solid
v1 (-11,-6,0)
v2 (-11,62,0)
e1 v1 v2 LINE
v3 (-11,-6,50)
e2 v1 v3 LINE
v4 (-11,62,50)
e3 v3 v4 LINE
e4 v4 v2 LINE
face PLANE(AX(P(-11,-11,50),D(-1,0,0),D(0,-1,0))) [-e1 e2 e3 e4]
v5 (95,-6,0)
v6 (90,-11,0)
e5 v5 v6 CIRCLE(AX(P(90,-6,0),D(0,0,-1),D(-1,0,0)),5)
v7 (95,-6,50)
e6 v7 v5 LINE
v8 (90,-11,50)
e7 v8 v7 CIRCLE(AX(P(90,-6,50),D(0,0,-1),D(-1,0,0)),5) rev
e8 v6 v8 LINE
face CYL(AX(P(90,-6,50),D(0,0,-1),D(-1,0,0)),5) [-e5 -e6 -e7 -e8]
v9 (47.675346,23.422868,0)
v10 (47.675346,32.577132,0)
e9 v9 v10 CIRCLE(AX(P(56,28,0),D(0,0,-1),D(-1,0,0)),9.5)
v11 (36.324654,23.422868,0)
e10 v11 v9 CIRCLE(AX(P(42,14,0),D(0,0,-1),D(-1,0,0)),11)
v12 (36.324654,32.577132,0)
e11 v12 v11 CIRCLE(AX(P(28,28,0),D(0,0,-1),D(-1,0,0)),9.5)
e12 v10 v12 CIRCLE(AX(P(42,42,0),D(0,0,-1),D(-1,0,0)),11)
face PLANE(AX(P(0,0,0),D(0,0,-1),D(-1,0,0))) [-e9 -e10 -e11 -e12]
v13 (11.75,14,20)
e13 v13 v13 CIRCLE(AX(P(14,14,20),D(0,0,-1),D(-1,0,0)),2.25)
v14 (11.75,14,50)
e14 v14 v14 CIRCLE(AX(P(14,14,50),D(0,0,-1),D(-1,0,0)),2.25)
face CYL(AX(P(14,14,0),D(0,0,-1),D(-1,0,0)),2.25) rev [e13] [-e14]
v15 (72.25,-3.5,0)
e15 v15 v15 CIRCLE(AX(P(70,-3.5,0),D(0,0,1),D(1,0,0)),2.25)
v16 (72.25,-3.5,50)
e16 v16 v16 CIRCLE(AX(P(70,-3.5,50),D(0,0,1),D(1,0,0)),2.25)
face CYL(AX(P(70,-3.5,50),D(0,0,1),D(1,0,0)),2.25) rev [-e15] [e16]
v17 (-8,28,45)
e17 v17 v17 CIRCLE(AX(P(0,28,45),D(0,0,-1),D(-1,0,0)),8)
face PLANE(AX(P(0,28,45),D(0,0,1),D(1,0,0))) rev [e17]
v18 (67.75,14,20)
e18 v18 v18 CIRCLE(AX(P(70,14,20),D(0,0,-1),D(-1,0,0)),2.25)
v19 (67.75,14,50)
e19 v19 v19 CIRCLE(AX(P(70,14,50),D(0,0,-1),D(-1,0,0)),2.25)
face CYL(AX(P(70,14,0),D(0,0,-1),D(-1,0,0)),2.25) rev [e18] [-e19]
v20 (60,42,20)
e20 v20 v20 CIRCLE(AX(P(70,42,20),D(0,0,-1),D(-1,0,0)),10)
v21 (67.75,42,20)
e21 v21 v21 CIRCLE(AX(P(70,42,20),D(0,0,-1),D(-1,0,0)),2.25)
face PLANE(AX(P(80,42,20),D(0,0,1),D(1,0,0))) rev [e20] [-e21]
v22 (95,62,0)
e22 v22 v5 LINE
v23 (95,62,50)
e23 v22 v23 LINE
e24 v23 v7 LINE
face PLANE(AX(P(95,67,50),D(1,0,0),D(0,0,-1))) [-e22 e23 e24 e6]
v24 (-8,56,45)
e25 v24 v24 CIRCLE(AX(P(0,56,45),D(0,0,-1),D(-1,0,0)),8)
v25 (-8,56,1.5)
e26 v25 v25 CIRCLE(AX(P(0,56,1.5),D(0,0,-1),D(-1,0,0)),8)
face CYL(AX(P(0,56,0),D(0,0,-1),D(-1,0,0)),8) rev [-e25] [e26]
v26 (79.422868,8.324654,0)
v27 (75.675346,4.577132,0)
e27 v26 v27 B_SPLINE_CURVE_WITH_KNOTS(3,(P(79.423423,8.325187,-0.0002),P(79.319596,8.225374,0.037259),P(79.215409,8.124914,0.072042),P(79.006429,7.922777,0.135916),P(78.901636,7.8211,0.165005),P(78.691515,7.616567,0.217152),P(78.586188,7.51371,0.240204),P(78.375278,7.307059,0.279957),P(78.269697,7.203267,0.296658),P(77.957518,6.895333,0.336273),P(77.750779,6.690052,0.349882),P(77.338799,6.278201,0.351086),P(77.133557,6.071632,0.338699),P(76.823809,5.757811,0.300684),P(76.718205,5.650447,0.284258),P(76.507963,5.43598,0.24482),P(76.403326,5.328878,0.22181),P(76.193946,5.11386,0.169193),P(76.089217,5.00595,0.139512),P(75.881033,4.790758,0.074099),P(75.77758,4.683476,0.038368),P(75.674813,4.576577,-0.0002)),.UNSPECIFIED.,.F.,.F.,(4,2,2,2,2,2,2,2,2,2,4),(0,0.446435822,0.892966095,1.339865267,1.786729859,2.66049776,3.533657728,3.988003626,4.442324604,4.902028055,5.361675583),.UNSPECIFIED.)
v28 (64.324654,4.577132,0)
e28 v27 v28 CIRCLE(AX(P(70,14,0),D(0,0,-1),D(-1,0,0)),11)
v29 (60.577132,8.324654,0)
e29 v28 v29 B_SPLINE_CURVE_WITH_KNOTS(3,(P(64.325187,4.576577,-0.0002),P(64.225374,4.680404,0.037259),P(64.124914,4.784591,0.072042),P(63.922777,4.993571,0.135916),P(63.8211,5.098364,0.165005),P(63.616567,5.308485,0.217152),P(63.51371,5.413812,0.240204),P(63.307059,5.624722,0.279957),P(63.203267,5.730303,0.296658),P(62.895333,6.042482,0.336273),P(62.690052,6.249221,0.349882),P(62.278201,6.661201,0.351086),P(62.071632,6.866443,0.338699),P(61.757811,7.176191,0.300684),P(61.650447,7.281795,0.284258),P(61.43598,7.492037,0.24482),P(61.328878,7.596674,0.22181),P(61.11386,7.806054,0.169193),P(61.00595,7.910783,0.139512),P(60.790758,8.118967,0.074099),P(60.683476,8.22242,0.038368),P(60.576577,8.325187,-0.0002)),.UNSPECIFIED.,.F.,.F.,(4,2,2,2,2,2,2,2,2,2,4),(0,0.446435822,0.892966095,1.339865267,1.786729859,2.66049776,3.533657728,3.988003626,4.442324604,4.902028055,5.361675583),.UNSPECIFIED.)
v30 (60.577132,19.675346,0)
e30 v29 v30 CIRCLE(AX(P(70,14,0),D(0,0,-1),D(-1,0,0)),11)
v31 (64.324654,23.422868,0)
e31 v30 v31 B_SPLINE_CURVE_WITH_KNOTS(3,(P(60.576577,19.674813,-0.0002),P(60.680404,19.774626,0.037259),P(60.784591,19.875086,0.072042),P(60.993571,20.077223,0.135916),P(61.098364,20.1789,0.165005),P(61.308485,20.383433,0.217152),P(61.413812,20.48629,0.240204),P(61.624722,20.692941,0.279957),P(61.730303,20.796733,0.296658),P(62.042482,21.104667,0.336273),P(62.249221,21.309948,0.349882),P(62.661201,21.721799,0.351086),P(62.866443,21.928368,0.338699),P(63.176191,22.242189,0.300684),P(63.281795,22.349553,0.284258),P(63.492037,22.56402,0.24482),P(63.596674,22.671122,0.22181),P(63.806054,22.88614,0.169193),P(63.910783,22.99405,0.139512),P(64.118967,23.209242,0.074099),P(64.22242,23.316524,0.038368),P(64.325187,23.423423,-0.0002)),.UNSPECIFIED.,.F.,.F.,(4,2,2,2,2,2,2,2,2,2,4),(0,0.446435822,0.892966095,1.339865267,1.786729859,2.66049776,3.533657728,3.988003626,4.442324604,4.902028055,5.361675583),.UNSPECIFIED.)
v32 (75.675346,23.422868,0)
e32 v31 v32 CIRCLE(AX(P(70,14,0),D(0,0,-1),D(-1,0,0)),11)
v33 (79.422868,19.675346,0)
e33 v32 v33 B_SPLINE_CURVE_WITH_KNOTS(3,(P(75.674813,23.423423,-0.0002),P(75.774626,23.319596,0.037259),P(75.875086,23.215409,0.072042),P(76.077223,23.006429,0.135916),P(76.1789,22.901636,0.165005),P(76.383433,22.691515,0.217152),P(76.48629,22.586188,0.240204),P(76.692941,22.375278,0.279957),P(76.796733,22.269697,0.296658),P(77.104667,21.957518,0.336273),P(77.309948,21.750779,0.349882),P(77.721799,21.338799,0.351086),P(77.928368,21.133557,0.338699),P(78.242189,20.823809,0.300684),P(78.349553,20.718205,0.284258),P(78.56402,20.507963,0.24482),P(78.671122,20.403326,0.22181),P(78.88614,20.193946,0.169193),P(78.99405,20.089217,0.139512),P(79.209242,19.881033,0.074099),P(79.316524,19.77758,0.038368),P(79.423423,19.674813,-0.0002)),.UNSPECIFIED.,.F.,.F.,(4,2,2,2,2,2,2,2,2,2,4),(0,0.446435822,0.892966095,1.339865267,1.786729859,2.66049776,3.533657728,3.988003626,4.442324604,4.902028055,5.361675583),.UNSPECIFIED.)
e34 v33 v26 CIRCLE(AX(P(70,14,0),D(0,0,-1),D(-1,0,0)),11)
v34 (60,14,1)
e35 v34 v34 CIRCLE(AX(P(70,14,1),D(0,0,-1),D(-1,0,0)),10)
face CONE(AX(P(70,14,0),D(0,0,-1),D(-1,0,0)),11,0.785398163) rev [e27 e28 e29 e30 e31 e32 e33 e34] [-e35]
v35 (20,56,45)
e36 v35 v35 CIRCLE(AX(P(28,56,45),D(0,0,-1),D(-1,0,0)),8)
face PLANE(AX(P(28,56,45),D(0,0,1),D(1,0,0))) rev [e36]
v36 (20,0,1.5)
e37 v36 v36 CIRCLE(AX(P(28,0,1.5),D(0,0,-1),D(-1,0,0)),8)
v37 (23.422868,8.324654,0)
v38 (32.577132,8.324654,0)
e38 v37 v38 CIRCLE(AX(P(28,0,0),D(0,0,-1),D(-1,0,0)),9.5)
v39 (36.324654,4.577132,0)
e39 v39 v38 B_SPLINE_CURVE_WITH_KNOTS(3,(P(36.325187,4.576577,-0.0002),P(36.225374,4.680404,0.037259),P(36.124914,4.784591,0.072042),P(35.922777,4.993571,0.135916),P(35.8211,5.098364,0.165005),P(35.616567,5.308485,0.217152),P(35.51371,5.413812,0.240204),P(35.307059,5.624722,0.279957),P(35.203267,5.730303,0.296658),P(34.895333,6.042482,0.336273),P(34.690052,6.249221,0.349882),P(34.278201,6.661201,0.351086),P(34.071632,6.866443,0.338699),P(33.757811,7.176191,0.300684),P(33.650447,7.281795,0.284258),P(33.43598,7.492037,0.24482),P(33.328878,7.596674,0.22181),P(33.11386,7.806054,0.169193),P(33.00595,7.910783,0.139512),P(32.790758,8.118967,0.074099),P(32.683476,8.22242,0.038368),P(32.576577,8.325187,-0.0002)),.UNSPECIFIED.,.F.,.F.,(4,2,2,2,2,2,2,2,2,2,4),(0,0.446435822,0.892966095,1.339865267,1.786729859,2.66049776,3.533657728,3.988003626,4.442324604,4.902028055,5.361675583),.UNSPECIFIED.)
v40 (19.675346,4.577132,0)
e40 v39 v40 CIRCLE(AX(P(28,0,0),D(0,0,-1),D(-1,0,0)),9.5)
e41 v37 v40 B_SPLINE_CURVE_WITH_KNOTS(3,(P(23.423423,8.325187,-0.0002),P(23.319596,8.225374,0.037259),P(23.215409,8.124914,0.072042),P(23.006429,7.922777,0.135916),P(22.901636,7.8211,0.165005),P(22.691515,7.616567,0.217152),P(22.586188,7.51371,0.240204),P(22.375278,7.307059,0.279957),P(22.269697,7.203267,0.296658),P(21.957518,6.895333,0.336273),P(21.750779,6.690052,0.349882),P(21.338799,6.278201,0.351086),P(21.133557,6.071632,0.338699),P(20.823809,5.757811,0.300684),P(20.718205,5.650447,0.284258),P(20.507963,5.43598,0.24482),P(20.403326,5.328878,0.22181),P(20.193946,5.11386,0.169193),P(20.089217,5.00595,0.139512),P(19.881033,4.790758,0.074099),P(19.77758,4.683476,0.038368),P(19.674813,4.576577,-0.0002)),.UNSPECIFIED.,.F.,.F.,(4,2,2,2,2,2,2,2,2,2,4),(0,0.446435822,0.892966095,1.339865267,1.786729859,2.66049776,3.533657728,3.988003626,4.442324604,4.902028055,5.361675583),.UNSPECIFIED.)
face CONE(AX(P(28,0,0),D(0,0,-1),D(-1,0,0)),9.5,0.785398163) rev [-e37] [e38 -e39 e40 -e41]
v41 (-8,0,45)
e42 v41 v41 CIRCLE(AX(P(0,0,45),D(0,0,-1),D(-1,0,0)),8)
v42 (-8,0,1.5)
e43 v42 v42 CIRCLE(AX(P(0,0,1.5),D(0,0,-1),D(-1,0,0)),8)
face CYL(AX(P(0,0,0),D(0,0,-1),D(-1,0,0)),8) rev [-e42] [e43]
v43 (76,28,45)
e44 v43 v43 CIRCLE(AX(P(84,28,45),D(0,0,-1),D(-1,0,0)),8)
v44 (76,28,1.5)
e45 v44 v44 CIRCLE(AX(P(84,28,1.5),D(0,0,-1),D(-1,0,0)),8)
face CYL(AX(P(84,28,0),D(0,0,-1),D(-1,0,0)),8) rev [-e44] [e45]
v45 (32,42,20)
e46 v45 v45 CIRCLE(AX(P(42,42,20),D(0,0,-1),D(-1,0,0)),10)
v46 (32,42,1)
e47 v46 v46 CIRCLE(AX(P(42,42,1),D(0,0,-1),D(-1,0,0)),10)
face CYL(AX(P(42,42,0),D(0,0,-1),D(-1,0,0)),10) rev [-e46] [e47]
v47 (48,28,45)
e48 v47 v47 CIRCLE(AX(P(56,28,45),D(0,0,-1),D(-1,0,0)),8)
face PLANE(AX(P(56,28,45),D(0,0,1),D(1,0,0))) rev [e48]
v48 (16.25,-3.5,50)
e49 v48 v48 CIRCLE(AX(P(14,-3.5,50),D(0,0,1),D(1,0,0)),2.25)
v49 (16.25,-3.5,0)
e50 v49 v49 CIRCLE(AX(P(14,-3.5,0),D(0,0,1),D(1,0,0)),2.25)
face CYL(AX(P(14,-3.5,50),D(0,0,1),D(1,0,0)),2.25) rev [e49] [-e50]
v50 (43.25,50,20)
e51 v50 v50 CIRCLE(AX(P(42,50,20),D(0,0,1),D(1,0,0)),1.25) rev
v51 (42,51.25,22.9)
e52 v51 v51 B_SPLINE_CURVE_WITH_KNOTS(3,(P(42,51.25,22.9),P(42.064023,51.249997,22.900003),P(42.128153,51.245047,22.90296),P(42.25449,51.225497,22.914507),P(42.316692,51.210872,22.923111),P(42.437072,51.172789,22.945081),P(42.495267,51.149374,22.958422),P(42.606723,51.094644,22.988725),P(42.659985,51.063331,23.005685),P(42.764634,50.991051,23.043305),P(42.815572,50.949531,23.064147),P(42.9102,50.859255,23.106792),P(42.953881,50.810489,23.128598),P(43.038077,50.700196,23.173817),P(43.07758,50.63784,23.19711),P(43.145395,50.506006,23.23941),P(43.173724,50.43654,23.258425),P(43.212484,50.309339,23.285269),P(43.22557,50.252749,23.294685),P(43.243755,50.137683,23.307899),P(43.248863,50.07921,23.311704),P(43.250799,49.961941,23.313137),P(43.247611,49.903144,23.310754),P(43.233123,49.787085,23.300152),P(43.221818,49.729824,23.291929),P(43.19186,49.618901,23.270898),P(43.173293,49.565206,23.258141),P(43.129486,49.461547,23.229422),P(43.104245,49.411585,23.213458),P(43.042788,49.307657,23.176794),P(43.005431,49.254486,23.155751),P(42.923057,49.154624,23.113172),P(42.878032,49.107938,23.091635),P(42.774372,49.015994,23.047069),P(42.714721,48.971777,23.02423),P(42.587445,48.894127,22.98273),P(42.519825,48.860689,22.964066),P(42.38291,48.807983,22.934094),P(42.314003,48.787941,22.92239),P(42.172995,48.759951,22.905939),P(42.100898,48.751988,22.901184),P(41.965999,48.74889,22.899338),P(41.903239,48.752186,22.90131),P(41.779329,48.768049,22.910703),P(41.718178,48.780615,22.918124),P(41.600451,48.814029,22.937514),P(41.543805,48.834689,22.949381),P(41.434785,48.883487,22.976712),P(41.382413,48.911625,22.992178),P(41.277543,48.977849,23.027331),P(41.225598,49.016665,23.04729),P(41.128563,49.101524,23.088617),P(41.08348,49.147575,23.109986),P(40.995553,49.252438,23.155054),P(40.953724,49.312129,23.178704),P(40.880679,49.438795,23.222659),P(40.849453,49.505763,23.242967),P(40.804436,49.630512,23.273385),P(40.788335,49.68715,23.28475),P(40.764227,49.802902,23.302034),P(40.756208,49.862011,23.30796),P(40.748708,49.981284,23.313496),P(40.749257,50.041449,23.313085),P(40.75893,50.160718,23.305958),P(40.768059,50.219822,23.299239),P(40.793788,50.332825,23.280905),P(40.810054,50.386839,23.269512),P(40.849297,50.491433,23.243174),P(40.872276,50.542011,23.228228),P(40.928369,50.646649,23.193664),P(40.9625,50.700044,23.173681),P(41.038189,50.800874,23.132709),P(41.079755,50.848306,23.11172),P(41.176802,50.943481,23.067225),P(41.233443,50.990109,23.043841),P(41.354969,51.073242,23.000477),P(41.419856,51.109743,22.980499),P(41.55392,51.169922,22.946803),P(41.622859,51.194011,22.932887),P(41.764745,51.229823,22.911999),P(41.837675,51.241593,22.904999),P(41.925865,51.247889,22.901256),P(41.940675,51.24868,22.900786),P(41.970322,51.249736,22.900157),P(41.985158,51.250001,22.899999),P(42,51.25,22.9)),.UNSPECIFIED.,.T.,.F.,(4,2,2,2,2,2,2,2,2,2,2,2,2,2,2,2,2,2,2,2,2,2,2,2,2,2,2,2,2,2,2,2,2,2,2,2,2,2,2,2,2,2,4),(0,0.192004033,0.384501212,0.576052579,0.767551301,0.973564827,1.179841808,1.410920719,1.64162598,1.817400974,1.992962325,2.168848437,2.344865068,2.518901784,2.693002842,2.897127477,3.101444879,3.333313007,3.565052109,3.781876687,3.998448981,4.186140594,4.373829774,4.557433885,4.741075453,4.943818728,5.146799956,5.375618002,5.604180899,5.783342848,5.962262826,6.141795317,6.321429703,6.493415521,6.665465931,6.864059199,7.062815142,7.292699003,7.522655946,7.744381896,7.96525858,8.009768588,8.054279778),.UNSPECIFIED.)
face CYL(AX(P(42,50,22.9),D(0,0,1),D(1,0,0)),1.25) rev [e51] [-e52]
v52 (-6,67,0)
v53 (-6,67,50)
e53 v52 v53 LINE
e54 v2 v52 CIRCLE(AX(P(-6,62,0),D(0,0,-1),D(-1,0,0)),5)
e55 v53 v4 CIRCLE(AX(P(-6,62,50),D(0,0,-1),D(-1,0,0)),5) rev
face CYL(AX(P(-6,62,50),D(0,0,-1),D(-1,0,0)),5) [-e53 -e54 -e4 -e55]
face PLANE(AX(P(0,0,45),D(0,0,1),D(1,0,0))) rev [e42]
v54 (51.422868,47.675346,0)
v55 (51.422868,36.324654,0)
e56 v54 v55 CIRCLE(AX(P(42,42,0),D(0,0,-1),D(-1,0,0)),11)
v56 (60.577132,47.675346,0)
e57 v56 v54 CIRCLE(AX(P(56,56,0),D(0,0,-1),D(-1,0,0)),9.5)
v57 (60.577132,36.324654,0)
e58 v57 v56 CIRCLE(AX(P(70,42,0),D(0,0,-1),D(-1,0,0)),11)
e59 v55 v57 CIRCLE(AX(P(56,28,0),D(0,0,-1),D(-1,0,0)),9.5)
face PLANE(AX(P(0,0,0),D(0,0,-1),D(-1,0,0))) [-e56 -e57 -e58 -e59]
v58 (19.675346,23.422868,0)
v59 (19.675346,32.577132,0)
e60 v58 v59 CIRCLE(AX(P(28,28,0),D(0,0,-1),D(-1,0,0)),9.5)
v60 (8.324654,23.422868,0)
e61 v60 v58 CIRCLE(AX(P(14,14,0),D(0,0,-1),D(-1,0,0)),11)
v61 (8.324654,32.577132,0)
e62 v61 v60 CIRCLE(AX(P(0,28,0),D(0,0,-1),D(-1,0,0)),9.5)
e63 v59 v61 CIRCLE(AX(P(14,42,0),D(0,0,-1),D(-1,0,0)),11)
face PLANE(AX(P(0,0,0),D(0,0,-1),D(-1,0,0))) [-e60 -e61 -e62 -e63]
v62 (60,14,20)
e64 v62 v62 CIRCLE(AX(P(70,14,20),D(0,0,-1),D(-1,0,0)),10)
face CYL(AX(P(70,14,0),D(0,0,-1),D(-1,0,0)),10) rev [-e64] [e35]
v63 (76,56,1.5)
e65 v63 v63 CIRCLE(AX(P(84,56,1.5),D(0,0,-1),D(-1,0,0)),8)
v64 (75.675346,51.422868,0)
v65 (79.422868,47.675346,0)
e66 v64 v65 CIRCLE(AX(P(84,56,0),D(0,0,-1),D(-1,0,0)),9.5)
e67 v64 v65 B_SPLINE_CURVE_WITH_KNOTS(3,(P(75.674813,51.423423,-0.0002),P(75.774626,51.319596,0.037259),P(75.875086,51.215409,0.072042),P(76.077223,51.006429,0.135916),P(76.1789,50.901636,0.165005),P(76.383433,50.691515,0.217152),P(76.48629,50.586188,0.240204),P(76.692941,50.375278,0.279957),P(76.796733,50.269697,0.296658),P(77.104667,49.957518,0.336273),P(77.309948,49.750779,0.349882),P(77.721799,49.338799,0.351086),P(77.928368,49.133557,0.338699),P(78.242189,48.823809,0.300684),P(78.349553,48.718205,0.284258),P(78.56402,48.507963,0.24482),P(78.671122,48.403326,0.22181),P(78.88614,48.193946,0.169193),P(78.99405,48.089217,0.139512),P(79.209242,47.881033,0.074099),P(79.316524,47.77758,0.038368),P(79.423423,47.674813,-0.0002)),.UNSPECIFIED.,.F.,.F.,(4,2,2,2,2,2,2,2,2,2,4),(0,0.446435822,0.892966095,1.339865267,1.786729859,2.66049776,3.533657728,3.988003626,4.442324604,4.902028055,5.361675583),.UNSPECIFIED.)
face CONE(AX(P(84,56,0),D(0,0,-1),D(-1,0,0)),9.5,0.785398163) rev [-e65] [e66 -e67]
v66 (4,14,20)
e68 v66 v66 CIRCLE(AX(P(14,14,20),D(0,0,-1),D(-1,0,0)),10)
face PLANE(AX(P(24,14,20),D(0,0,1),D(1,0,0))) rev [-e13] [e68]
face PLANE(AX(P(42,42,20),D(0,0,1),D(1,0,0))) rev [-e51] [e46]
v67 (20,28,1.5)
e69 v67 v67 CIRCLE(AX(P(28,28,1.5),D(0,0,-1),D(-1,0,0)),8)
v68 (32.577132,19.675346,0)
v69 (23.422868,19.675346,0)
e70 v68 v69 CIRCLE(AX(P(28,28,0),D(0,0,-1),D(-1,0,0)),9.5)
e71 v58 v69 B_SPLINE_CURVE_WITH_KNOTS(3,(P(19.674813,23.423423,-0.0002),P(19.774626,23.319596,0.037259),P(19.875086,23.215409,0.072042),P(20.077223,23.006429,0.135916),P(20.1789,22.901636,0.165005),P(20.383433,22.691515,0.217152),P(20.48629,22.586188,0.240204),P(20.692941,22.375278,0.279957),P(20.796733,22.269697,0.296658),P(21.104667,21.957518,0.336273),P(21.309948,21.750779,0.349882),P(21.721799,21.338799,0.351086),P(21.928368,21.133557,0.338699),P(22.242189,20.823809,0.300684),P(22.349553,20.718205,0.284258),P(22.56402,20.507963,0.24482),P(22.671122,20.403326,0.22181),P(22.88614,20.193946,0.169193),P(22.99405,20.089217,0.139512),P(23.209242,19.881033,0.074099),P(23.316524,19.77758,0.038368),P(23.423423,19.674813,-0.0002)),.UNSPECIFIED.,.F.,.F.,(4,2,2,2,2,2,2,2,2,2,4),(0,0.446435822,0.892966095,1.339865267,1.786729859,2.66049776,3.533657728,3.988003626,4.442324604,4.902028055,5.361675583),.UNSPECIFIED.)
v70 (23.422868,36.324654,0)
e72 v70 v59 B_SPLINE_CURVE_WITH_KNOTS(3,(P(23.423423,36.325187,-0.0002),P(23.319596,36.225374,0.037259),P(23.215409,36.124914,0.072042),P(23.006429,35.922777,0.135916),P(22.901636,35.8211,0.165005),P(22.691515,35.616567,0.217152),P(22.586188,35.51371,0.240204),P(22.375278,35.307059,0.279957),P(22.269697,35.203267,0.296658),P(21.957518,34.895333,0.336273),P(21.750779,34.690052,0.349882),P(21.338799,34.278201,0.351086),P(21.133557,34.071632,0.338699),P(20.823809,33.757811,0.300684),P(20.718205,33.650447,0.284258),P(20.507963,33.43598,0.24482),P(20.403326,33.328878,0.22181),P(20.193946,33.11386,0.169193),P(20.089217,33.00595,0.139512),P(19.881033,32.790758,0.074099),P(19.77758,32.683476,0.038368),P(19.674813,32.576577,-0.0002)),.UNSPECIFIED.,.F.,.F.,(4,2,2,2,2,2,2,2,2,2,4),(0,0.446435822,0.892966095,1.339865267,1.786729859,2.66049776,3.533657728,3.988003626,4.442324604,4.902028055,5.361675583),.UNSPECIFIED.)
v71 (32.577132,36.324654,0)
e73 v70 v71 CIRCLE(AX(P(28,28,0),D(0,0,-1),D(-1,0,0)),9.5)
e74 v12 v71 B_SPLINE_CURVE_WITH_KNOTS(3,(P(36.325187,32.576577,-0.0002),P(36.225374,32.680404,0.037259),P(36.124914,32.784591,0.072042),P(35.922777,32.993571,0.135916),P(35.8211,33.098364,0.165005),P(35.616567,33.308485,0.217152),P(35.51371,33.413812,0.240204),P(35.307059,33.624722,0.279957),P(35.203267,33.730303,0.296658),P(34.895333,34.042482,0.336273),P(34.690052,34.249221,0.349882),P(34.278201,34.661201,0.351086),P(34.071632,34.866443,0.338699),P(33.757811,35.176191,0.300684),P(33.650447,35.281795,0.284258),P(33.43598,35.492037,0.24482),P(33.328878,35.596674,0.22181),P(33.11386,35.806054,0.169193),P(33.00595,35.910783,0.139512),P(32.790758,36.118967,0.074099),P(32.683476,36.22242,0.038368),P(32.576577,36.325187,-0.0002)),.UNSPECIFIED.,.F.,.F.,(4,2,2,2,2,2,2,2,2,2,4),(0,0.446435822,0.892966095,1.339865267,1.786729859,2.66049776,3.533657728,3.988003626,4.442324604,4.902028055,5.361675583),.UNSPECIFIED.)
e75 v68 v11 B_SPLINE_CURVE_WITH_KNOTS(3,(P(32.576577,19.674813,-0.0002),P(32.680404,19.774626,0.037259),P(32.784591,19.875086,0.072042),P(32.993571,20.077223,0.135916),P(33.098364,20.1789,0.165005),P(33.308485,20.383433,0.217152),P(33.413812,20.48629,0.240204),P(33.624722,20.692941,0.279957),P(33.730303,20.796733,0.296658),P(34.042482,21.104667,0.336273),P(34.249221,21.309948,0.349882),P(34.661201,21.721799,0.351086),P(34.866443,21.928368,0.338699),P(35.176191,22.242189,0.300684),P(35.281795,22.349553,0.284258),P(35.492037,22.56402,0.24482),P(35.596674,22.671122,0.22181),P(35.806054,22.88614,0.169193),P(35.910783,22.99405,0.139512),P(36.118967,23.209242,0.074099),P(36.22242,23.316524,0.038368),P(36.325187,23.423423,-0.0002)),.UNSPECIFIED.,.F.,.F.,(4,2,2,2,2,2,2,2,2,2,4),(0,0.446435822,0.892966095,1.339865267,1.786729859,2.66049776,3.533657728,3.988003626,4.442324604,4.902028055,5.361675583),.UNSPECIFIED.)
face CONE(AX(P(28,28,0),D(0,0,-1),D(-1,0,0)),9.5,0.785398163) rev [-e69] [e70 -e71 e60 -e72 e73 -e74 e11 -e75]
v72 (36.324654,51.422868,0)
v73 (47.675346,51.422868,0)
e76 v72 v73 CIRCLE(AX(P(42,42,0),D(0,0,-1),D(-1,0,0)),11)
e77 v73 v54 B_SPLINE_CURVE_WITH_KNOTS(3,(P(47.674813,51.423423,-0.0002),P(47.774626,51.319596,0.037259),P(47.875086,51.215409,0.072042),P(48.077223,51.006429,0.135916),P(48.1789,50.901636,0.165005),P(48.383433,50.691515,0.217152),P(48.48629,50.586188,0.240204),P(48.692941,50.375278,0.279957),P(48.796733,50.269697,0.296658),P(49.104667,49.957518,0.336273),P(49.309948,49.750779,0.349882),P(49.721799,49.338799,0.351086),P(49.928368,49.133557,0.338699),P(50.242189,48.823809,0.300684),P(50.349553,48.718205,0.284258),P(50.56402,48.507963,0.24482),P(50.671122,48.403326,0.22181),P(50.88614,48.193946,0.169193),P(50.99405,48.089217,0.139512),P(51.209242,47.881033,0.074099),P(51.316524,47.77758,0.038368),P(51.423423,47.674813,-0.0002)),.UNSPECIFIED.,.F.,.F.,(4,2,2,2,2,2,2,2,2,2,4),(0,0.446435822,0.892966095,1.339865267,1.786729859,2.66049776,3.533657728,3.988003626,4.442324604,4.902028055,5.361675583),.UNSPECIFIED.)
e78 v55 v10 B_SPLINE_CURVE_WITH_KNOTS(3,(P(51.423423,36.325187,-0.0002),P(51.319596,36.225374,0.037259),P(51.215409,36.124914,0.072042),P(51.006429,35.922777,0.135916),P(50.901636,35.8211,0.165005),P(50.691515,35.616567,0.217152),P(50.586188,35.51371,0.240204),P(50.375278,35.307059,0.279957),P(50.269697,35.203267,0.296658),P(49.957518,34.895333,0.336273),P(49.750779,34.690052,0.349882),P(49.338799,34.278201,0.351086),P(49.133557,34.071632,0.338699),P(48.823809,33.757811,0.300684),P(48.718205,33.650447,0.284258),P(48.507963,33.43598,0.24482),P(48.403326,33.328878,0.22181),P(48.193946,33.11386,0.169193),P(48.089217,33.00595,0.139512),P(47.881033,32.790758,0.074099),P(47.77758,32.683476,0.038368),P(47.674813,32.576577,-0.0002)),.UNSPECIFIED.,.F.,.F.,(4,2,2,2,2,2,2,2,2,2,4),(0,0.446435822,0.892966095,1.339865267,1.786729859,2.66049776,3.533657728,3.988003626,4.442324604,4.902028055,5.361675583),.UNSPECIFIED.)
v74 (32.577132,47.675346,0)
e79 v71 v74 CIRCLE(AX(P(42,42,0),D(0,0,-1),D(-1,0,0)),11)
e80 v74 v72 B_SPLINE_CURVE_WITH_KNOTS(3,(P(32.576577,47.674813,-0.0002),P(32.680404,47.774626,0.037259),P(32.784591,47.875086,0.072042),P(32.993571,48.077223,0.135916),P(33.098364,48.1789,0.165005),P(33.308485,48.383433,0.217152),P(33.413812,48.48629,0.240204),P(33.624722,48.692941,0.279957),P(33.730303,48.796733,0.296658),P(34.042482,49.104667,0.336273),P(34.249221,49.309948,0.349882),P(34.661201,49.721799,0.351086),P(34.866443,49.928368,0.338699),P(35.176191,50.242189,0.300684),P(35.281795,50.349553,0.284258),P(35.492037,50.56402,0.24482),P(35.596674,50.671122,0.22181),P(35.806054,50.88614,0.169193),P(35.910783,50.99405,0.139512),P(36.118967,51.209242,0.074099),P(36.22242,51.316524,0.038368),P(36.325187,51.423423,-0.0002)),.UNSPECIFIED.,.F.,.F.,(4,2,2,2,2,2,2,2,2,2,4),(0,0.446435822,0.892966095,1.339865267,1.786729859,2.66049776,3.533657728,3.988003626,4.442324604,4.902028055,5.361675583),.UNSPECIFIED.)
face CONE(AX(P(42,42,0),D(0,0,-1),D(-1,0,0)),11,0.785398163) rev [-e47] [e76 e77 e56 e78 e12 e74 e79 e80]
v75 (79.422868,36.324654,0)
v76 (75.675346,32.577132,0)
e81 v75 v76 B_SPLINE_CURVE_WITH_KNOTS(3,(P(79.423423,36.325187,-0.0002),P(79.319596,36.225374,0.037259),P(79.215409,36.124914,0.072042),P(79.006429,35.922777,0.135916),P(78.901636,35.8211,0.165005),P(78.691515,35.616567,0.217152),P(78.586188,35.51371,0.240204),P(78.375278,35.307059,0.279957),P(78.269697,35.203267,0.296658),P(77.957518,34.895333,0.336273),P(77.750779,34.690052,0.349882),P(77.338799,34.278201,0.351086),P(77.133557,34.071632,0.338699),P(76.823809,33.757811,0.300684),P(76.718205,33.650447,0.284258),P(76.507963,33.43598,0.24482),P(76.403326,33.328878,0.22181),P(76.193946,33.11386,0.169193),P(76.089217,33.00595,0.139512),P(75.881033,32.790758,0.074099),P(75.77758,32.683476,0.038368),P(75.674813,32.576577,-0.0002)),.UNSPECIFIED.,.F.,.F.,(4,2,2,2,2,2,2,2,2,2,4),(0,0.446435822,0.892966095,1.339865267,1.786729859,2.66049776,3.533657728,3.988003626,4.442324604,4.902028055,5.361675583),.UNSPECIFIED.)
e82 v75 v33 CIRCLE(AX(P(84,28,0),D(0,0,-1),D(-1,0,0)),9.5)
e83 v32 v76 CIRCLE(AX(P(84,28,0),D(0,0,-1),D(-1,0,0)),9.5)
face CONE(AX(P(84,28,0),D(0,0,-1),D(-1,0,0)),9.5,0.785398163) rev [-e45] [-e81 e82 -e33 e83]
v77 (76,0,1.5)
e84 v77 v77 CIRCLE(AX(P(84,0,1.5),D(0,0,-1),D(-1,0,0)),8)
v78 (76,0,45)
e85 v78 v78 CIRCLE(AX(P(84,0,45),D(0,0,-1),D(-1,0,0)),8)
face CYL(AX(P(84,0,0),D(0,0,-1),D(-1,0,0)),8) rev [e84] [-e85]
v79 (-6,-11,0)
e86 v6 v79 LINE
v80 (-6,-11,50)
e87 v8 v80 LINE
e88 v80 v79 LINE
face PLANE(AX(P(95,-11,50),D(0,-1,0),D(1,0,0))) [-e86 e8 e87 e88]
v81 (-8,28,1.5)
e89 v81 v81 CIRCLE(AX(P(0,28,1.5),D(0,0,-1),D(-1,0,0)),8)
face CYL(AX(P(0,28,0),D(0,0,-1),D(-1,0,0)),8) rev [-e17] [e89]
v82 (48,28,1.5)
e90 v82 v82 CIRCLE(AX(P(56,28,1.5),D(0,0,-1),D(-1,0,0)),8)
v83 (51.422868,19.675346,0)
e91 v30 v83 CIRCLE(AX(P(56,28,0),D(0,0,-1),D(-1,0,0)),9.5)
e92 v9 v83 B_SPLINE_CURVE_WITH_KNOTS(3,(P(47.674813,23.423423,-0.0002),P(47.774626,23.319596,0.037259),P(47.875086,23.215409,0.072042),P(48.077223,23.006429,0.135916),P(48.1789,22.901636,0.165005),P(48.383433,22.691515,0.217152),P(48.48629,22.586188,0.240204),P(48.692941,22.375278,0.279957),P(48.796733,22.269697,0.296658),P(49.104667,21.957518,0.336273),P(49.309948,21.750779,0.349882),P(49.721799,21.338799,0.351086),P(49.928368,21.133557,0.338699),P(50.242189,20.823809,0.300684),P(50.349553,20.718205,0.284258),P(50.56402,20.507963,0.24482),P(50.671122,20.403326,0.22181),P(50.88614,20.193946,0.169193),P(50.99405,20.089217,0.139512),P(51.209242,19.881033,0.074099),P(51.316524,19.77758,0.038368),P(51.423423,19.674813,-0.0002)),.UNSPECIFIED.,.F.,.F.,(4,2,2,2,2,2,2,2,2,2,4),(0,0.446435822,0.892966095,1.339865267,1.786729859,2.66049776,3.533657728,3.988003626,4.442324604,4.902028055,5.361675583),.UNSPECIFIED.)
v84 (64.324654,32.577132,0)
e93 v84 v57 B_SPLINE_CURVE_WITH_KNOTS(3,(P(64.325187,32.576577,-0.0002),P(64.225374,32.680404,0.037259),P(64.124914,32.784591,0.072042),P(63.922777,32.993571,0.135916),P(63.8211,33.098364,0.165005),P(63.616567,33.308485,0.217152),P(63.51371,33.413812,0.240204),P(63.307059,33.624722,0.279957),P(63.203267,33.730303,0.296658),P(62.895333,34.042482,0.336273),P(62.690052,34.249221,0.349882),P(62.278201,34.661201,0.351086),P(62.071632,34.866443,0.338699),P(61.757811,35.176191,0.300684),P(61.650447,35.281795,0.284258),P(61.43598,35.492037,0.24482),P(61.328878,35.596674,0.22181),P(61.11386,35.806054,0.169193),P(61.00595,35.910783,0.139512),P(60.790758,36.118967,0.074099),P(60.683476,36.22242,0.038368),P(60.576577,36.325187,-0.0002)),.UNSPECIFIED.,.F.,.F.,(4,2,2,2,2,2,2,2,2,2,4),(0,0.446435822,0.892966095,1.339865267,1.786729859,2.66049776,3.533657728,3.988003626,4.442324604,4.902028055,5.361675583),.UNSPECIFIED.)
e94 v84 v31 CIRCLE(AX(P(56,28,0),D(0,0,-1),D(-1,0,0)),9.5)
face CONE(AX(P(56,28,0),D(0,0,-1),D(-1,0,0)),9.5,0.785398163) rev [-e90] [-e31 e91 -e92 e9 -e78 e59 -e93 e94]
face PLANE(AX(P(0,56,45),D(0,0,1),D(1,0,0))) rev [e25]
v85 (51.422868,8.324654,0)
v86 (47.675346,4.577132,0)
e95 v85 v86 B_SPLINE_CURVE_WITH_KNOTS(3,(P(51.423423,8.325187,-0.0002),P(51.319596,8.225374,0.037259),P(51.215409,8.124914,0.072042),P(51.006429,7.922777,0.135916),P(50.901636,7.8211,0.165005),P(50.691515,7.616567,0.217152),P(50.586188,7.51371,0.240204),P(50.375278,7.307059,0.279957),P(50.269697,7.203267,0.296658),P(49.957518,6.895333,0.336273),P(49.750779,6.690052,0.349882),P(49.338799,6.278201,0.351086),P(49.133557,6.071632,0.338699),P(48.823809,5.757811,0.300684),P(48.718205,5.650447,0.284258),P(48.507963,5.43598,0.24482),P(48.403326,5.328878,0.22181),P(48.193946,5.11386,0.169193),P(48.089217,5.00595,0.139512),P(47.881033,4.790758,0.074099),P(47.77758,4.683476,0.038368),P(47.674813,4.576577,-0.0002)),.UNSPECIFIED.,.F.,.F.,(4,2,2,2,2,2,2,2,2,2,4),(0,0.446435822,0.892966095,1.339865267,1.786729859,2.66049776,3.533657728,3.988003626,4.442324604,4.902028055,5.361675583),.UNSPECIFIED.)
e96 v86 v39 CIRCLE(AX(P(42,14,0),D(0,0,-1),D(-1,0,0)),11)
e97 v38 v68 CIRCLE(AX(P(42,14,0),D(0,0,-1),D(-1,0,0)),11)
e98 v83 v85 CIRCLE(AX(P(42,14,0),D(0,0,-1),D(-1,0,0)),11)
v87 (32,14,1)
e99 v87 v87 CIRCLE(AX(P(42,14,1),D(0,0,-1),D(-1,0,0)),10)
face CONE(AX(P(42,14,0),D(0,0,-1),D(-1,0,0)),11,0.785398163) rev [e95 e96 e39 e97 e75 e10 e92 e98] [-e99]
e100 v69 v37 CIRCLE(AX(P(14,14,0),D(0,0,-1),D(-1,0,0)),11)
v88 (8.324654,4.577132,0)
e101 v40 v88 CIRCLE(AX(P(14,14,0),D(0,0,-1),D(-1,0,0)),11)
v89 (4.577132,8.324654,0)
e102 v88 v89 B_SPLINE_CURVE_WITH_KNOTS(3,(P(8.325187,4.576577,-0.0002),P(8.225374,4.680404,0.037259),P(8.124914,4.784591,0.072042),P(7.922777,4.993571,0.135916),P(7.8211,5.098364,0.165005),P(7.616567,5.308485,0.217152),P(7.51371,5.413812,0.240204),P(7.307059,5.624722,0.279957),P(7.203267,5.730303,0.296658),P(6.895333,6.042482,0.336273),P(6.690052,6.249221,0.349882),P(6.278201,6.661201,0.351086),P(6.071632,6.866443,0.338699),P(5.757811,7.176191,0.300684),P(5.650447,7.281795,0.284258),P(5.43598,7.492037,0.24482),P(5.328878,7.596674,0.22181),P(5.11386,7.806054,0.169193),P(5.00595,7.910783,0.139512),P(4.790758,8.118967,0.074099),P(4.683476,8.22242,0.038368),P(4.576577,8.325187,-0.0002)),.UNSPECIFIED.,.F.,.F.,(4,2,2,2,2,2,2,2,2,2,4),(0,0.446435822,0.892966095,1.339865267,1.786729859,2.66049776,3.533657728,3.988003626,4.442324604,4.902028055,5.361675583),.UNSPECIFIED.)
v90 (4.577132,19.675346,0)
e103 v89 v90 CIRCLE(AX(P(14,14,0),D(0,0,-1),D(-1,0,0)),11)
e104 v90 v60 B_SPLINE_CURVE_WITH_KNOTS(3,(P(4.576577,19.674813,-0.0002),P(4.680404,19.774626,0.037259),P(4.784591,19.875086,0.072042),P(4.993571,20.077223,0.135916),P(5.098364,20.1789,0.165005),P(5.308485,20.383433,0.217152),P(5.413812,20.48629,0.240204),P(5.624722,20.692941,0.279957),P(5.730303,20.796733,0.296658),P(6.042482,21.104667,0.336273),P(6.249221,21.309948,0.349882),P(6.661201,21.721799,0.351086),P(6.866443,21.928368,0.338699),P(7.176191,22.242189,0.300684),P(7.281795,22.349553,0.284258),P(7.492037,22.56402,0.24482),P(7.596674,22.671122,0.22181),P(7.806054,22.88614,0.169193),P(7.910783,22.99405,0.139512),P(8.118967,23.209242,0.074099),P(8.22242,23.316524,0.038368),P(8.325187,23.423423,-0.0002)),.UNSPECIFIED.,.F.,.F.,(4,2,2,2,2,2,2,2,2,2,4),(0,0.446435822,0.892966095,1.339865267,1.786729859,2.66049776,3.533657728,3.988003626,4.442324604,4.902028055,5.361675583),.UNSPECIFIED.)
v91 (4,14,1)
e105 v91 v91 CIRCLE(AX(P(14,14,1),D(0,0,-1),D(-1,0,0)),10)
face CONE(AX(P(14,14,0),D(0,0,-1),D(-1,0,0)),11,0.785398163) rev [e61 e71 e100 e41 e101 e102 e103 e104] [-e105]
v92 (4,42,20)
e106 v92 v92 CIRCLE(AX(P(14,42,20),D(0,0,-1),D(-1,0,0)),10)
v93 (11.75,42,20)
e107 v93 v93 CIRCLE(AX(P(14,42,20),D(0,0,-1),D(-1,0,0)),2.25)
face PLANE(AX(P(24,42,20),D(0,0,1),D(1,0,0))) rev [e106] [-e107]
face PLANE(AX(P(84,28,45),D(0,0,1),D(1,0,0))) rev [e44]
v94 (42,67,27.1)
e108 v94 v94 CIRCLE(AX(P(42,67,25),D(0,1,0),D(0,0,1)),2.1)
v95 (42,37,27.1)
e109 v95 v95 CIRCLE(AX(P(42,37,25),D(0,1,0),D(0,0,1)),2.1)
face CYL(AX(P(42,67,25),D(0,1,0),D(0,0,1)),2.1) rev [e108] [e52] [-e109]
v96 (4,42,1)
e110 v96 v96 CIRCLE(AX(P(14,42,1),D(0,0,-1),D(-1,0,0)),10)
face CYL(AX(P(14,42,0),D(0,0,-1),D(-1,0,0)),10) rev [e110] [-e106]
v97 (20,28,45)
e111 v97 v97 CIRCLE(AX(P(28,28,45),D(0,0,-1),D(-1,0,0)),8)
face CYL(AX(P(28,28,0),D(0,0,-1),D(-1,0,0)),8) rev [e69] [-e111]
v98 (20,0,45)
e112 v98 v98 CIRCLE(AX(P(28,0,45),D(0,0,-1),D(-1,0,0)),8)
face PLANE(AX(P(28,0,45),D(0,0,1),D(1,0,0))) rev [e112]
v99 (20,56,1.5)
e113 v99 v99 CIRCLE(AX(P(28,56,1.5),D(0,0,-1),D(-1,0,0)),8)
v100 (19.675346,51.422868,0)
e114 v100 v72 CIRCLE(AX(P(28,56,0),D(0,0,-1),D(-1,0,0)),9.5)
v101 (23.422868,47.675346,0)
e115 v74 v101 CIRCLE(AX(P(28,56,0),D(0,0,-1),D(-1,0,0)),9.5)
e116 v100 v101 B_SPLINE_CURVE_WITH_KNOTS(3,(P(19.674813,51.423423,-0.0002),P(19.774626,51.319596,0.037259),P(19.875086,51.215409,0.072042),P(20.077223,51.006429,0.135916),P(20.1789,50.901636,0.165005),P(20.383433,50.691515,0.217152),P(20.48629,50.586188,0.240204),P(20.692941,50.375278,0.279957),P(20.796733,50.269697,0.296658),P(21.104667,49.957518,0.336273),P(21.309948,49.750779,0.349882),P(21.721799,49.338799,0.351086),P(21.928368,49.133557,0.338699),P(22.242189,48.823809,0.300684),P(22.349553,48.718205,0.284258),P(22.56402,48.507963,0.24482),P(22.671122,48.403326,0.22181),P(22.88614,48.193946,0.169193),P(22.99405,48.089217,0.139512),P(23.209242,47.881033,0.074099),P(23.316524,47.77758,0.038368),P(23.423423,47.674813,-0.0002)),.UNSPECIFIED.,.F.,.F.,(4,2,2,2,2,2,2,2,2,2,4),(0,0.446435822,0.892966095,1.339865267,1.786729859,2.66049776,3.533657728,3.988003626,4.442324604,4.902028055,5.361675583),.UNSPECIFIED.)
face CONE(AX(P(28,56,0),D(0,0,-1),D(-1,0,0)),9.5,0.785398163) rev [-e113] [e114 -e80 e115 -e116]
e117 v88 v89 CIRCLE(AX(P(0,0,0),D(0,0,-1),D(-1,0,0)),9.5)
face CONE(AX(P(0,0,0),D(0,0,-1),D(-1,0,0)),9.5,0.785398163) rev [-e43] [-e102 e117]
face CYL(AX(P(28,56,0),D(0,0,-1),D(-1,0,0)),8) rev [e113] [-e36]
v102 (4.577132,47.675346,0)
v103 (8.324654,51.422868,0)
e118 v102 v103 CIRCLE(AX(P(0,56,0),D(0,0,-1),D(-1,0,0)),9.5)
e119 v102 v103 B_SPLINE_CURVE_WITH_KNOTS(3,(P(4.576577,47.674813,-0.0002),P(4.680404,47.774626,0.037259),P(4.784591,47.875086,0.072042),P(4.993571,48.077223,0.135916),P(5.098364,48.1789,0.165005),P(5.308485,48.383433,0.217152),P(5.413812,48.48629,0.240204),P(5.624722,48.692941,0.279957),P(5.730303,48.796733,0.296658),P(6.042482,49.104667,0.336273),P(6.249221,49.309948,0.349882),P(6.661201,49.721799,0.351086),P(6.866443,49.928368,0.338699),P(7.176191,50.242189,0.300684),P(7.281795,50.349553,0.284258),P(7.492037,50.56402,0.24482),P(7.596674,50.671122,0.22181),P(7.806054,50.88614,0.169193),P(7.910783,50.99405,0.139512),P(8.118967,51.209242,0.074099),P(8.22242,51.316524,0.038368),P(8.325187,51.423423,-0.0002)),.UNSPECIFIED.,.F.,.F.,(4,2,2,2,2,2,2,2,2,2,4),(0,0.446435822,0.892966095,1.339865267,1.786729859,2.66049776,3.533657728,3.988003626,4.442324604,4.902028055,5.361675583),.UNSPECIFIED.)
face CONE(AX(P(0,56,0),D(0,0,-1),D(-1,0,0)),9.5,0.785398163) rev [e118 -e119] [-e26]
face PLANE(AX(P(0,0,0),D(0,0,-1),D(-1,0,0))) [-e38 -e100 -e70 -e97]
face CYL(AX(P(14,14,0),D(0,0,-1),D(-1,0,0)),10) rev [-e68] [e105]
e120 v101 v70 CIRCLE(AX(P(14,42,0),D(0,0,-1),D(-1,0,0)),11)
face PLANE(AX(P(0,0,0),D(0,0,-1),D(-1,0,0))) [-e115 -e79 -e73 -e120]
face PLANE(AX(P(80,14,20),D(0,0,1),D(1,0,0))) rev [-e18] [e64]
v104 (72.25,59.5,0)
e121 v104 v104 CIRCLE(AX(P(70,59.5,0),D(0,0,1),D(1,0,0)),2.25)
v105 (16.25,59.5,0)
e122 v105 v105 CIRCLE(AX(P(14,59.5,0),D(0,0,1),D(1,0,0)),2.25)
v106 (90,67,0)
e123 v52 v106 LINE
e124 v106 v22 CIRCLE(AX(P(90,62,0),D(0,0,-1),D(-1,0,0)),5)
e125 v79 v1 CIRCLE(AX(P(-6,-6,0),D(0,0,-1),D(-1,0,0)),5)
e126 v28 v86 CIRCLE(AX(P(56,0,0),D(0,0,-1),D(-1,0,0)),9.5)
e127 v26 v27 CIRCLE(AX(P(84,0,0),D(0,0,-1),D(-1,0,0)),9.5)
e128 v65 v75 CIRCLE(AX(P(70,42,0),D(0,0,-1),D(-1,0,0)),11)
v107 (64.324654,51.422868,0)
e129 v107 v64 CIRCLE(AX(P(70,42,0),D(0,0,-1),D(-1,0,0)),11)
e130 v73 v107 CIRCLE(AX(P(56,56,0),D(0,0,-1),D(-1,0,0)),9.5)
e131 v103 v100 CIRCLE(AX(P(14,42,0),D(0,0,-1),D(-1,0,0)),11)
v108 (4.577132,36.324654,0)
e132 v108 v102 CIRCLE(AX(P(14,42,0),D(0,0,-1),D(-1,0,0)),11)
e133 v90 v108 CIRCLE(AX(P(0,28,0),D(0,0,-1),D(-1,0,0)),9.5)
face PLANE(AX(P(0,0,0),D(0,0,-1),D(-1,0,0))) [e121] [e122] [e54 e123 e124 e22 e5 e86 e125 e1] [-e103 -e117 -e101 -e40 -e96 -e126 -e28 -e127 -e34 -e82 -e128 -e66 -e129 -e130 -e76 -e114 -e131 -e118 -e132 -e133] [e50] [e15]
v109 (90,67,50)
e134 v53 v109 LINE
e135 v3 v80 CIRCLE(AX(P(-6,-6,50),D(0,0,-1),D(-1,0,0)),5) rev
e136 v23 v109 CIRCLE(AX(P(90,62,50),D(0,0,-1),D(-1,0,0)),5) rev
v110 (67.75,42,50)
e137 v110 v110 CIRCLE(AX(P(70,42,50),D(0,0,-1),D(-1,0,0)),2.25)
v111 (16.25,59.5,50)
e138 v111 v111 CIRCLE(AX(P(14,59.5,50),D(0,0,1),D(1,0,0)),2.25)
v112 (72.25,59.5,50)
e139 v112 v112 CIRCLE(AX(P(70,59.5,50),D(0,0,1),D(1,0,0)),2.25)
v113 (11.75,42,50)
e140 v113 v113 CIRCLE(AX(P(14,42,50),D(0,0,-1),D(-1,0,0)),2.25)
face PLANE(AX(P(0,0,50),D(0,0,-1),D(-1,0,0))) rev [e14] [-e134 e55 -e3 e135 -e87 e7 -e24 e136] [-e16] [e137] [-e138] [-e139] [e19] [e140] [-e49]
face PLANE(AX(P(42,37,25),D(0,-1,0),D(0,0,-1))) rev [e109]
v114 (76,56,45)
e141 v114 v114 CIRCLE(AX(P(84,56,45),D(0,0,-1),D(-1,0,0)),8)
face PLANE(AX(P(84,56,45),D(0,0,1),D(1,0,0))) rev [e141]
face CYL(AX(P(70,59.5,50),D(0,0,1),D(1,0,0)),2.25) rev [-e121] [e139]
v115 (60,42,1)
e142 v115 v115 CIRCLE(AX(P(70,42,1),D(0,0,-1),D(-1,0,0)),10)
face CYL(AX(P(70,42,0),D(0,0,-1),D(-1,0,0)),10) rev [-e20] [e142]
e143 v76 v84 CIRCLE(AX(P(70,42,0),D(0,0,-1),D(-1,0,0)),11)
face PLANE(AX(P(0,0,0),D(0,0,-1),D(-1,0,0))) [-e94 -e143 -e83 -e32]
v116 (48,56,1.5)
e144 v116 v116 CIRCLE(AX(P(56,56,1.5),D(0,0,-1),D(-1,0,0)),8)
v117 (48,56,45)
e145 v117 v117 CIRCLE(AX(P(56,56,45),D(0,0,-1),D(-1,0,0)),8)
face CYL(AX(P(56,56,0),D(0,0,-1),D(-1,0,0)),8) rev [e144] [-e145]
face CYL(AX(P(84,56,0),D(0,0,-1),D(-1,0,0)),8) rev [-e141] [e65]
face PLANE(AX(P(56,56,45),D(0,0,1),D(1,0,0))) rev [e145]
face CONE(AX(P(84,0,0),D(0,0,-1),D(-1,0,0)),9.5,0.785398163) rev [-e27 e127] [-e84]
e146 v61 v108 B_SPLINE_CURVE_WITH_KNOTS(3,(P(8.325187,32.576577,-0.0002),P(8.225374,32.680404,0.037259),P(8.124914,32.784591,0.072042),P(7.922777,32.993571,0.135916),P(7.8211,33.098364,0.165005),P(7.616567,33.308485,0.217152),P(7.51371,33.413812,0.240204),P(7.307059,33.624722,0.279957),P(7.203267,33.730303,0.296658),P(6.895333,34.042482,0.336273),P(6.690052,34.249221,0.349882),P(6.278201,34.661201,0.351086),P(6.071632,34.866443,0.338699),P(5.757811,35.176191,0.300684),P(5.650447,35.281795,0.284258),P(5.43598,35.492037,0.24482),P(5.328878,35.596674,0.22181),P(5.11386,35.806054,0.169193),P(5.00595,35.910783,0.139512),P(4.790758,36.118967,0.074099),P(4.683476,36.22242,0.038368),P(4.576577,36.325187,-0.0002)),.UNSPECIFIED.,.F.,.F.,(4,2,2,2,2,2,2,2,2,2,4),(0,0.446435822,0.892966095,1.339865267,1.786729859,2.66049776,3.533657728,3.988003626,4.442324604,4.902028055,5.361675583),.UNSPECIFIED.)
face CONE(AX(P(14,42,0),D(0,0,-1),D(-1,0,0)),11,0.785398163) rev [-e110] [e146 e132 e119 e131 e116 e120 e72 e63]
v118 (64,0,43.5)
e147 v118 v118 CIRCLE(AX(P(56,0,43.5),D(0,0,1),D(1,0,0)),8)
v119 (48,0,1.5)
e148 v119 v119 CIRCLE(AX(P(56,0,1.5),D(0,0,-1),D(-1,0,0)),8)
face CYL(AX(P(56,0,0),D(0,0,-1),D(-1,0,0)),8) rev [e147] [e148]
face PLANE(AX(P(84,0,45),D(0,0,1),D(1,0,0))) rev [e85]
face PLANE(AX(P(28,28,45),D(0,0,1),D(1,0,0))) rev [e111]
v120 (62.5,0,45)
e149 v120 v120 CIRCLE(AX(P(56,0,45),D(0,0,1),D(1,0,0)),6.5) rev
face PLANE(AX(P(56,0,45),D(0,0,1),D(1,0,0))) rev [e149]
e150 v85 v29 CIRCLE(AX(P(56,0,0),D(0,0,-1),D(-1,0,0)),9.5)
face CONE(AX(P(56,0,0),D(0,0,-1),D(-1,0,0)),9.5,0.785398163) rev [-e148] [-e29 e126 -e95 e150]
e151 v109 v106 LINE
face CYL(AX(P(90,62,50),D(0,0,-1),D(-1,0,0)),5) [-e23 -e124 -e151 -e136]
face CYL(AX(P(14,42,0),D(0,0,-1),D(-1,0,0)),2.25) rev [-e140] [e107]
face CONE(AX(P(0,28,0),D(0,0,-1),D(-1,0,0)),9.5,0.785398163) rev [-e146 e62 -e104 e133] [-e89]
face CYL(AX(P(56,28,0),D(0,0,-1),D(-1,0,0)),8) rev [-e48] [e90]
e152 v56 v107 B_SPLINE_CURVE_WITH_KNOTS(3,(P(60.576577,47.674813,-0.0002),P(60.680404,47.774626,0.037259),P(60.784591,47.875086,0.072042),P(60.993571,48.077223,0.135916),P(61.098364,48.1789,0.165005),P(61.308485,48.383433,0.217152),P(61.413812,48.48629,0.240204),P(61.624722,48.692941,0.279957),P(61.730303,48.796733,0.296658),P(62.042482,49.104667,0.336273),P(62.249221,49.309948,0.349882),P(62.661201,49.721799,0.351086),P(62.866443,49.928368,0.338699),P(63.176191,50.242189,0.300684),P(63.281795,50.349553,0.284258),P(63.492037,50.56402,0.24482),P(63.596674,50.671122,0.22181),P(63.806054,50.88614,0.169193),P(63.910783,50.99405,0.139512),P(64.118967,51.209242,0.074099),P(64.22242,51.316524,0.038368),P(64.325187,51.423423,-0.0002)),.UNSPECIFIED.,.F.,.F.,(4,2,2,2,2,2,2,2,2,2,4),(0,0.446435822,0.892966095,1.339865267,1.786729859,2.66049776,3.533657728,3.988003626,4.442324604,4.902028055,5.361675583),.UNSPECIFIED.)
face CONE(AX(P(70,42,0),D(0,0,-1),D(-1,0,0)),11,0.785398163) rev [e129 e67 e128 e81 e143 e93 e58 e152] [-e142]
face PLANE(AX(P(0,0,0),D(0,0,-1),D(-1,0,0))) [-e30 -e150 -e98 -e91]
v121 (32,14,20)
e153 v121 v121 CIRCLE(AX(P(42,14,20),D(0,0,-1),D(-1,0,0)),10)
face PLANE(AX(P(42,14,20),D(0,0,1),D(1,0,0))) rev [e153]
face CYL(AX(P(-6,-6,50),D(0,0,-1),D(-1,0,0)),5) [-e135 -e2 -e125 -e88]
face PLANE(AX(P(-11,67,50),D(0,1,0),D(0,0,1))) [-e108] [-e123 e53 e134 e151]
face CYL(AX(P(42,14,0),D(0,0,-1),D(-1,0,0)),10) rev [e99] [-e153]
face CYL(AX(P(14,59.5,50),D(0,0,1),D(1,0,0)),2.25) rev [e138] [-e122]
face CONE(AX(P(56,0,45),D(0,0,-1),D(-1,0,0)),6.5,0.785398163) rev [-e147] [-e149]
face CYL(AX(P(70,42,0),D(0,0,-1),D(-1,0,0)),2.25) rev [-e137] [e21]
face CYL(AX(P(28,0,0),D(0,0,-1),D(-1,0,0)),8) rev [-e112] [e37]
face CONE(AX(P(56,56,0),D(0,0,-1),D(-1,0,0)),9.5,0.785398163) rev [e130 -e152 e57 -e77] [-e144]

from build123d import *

# Parameters (mm, degrees)
SKETCH1_W            = 106
SKETCH1_H            = 78
BOSS_EXTRUDE1_DEPTH  = 50
HOLEWZD1_D           = 4.5
HOLEWZD2_D           = 4.2
HOLEWZD2_DEPTH       = 30
HOLEWZD4_D           = 20
HOLEWZD4_DEPTH       = 20
HOLEWZD4_CSINK_D     = 22
HOLEWZD4_CSINK_ANGLE = 90
HOLEWZD5_AT_2_COUNT  = 2
HOLEWZD5_AT_2_PITCH  = 28
HOLEWZD5_AT_3_COUNT  = 2
HOLEWZD5_AT_3_PITCH  = 56
HOLEWZD5_AT_4_COUNT  = 2
HOLEWZD5_AT_4_PITCH  = 62.60990337
HOLEWZD6_D           = 16
HOLEWZD6_DEPTH       = 45
HOLEWZD6_CSINK_D     = 19
HOLEWZD6_CSINK_ANGLE = 90
CHAMFER1_SIZE        = 1.5
FILLET1_R            = 5


# Read off the part's stored shape, not the designer's step: HoleWzd3
with BuildPart() as part:
    # Sketch1 → Boss-Extrude1 (new body)
    with BuildSketch(Plane(origin=(0, 0, 0), x_dir=(-1, 0, 0), z_dir=(0, 0, -1))):
        with Locations((-42, 28)):
            Rectangle(SKETCH1_W, SKETCH1_H)
    extrude(amount=-BOSS_EXTRUDE1_DEPTH)

    # HoleWzd1 (through all)
    with Locations(Plane.XY.offset(50)):
        with Locations((14, 59.5), (70, -3.5), (14, -3.5), (70, 59.5)):
            Hole(HOLEWZD1_D / 2)

    # HoleWzd2
    with Locations(Plane(origin=(0, 67, 0), x_dir=(1, 0, 0), z_dir=(0, 1, 0))):
        with Locations((42, -25)):
            Hole(HOLEWZD2_D / 2, depth=HOLEWZD2_DEPTH)

    # HoleWzd3 outline → HoleWzd3 (revolve, cut)
    with BuildSketch(Plane(origin=(42, 50, 0), x_dir=(1, 0, 0), z_dir=(0, -1, 0))):
        Polygon((0, 14.648924226), (1.25, 15.4), (1.25, 23.312743137), (0, 23.312743137), align=None)
    revolve(axis=Axis((42, 50, 0), (0, 0, 1)), mode=Mode.SUBTRACT)

    # HoleWzd4
    with Locations(Plane(origin=(0, 0, 0), x_dir=(-1, 0, 0), z_dir=(0, 0, -1))):
        with Locations((-42, 14), (-42, 42)):
            CounterSinkHole(HOLEWZD4_D / 2, HOLEWZD4_CSINK_D / 2, depth=HOLEWZD4_DEPTH, counter_sink_angle=HOLEWZD4_CSINK_ANGLE)

    # Sketch9 → HoleWzd5 (revolve, cut)
    with BuildSketch(Plane(origin=(70, 42, 0), x_dir=(0, 1, 0), z_dir=(1, 0, 0))):
        Polygon((0, 0), (0, 50), (2.25, 50), (2.25, 20), (10, 20), (10, 1), (11, 0), align=None)
    holewzd5 = revolve(axis=Axis((70, 42, -6.35), (0, 0, 1)), mode=Mode.SUBTRACT)

    # HoleWzd5 at 2: HoleWzd5 ×2
    with Locations(*[(0, -i * HOLEWZD5_AT_2_PITCH, 0) for i in range(1, HOLEWZD5_AT_2_COUNT)]):
        add(holewzd5, mode=Mode.SUBTRACT)

    # HoleWzd5 at 3: HoleWzd5 ×2
    with Locations(*[(-i * HOLEWZD5_AT_3_PITCH, 0, 0) for i in range(1, HOLEWZD5_AT_3_COUNT)]):
        add(holewzd5, mode=Mode.SUBTRACT)

    # HoleWzd5 at 4: HoleWzd5 ×2
    with Locations(*[Vector(-0.894427190999916, -0.447213595499958, 0) * (i * HOLEWZD5_AT_4_PITCH) for i in range(1, HOLEWZD5_AT_4_COUNT)]):
        add(holewzd5, mode=Mode.SUBTRACT)

    # HoleWzd6
    with Locations(Plane(origin=(0, 0, 0), x_dir=(-1, 0, 0), z_dir=(0, 0, -1))):
        with Locations((-84, 56), (-84, 28), (-56, 56), (-56, 0), (-84, 0), (-28, 28), (-28, 56), (-56, 28), (-28, 0), (0, 28), (0, 0), (0, 56)):
            CounterSinkHole(HOLEWZD6_D / 2, HOLEWZD6_CSINK_D / 2, depth=HOLEWZD6_DEPTH, counter_sink_angle=HOLEWZD6_CSINK_ANGLE)

    # Chamfer1
    chamfer1_edges = [part.edges().sort_by_distance(p)[0] for p in [
        (48, 0, 45),
    ]]
    chamfer(chamfer1_edges, length=CHAMFER1_SIZE)

    # Fillet1
    fillet1_edges = [part.edges().sort_by_distance(p)[0] for p in [
        (95, -11, 25),
        (95, 67, 25),
        (-11, 67, 25),
        (-11, -11, 25),
    ]]
    fillet(fillet1_edges, radius=FILLET1_R)


solid = part.part
